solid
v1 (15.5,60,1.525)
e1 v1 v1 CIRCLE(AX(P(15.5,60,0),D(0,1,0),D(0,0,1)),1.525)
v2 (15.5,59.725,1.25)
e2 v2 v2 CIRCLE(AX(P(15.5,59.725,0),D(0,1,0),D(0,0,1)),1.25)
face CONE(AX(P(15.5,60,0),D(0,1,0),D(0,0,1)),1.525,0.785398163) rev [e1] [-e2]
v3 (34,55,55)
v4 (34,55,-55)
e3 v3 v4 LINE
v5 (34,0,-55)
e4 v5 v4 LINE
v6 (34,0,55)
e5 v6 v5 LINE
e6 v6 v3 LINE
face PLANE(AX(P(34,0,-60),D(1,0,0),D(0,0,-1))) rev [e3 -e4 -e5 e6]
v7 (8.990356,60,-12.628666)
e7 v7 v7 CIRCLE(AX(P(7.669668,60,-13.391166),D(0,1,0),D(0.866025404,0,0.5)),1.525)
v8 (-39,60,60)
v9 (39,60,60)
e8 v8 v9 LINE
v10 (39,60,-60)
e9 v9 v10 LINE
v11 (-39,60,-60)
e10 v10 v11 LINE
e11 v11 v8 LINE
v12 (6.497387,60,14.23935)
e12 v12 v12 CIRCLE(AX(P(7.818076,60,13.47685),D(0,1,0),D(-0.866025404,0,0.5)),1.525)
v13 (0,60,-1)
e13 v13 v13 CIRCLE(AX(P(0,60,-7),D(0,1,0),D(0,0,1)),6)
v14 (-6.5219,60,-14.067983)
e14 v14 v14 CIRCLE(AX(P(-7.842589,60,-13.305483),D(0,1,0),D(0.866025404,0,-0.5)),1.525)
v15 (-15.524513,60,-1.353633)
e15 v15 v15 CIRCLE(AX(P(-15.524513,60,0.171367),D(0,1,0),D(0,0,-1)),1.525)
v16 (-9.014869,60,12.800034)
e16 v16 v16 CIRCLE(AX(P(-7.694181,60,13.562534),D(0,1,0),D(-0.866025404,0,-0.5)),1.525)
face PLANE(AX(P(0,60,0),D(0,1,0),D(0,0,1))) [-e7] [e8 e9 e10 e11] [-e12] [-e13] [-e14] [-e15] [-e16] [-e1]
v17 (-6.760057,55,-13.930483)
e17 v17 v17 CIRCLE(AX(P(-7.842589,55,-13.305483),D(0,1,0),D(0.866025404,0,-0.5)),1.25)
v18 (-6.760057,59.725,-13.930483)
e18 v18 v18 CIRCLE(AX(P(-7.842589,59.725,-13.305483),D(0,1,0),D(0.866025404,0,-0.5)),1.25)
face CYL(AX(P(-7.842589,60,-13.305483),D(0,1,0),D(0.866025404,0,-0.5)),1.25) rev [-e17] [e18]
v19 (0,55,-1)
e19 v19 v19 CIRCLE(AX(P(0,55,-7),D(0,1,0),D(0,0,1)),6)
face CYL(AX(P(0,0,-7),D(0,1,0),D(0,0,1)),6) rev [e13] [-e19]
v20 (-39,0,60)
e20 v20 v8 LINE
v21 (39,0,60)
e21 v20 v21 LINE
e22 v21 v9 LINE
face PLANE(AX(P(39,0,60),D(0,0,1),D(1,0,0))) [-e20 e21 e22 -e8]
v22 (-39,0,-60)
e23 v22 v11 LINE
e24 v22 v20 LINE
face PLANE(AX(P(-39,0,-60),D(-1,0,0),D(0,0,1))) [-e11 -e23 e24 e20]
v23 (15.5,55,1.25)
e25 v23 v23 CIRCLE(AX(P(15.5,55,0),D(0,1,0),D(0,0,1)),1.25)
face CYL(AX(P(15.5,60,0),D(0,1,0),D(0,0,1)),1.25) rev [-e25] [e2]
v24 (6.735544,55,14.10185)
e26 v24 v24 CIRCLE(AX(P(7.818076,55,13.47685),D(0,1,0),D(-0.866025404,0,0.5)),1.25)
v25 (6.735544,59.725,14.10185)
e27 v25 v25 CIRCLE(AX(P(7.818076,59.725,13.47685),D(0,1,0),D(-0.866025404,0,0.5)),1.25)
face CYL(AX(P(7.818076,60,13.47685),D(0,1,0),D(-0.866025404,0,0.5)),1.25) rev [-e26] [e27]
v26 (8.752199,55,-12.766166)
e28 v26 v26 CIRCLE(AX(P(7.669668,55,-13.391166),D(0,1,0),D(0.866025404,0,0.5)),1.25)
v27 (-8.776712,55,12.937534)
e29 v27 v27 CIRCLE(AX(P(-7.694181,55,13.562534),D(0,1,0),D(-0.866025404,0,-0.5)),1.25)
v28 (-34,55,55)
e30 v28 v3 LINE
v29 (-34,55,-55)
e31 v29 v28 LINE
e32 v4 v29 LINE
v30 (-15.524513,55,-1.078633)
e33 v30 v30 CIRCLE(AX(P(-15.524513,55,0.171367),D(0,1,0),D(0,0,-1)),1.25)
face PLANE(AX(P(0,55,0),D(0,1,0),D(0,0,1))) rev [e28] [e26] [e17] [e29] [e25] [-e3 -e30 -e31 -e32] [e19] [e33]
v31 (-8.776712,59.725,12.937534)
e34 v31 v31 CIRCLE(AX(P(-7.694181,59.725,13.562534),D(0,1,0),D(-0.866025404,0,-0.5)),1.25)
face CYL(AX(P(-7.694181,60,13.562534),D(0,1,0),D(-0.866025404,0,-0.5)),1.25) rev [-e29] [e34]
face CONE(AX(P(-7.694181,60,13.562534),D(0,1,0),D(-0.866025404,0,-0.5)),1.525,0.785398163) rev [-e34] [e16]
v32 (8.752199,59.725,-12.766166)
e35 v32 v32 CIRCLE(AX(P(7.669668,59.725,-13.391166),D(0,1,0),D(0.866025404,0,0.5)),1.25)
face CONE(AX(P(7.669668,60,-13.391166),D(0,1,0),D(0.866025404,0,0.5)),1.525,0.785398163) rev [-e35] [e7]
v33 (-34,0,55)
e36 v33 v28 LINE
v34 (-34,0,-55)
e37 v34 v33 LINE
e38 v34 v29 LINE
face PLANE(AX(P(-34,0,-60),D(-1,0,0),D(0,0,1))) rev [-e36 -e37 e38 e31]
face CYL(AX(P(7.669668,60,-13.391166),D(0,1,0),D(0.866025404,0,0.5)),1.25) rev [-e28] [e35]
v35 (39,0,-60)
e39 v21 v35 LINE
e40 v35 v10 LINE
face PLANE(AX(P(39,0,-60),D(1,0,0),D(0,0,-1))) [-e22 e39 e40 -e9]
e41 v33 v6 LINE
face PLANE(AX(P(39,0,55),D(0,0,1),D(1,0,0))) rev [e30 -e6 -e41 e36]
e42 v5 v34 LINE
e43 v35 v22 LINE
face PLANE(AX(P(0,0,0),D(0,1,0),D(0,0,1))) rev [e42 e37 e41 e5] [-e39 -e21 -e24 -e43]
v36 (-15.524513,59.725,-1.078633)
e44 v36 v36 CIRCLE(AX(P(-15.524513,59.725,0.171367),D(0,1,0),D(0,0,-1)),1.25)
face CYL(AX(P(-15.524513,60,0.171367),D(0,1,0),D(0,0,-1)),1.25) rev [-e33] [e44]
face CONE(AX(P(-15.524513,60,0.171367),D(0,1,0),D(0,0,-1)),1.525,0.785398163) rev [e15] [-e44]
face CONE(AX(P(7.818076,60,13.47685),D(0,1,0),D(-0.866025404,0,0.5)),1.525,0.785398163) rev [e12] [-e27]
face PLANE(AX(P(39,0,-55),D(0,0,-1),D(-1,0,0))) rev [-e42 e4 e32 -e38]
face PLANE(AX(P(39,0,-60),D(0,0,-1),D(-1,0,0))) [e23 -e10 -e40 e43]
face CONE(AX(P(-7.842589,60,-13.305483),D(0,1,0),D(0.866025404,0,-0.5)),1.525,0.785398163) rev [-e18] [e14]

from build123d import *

# Parameters (mm, degrees)
IZIM1_R                     = 50
Y_KSEKLIK_EKSTR_ZYON1_DEPTH = 60
BO_ALTMA8_T                 = -5
IZIM2_R                     = 6
KES_EKSTR_ZYON1_DEPTH       = 60
DAIRESEL_KAPLAMA3_COUNT     = 6
IZIM6_R                     = 1.6
KES_EKSTR_ZYON2_DEPTH       = 4
DAIRESEL_KAPLAMA4_COUNT     = 6
IZIM7_W                     = 78
IZIM7_H                     = 120
Y_KSEKLIK_EKSTR_ZYON2_DEPTH = 60
KES_EKSTR_ZYON3_START       = -60
KES_EKSTR_ZYON3_DEPTH       = 60
BO_ALTMA9_T                 = -5
IZIM9_R                     = 6
KES_EKSTR_ZYON4_DEPTH       = 60
DAIRESEL_KAPLAMA5_COUNT     = 6


# Read off the part's stored shape, not the designer's step: M3x0.5 Dişli Delik1
with BuildPart() as part:
    # Çizim1 → Yükseklik-Ekstrüzyon1 (new body)
    with BuildSketch(Plane(origin=(0, 0, 0), x_dir=(1, 0, 0), z_dir=(0, 1, 0))):
        with Locations(Location((0, 0, 0), (0, 0, 270))):
            Circle(IZIM1_R)
    extrude(amount=Y_KSEKLIK_EKSTR_ZYON1_DEPTH)

    # İç Boşaltma8
    bo_altma8_openings = [part.faces().sort_by_distance(p)[0] for p in [
        (0, 0, 0),
    ]]
    offset(amount=BO_ALTMA8_T, openings=bo_altma8_openings, kind=Kind.INTERSECTION)

    # Çizim2 → Kes-Ekstrüzyon1 (cut)
    with BuildSketch(Plane(origin=(0, 60, 0), x_dir=(1, 0, 0), z_dir=(0, 1, 0))):
        with Locations(Location((0, 7, 0), (0, 0, 270))):
            Circle(IZIM2_R)
    extrude(amount=-KES_EKSTR_ZYON1_DEPTH, mode=Mode.SUBTRACT)

    # M3x0.5 Dişli Delik1 outline → M3x0.5 Dişli Delik1 (revolve, cut)
    with BuildSketch(Plane(origin=(15.5, 0, 0), x_dir=(1, 0, 0), z_dir=(0, 0, 1))):
        Polygon((0, 55), (1.25, 55), (1.25, 59.65), (1.6, 60), (0, 60), align=None)
    m3x0_5_di_li_delik1 = revolve(axis=Axis((15.5, 0, 0), (0, 1, 0)), mode=Mode.SUBTRACT)

    # Dairesel Kaplama3: M3x0.5 Dişli Delik1 ×6 about axis
    dairesel_kaplama3_axis = Axis((0, 0, 0), (0, 1, 0))
    for i in range(1, DAIRESEL_KAPLAMA3_COUNT):
        add(m3x0_5_di_li_delik1.rotate(dairesel_kaplama3_axis, i * 360 / DAIRESEL_KAPLAMA3_COUNT), mode=Mode.SUBTRACT)

    # Çizim6 → Kes-Ekstrüzyon2 (cut)
    with BuildSketch(Plane(origin=(0, 60, 0), x_dir=(1, 0, 0), z_dir=(0, 1, 0))):
        with Locations(Location((15.5, 0, 0), (0, 0, 270))):
            Circle(IZIM6_R)
    kes_ekstr_zyon2 = extrude(amount=-KES_EKSTR_ZYON2_DEPTH, mode=Mode.SUBTRACT)

    # Dairesel Kaplama4: Kes-Ekstrüzyon2 ×6 about axis
    dairesel_kaplama4_axis = Axis((0, 0, 0), (0, 1, 0))
    for i in range(1, DAIRESEL_KAPLAMA4_COUNT):
        add(kes_ekstr_zyon2.rotate(dairesel_kaplama4_axis, i * 360 / DAIRESEL_KAPLAMA4_COUNT), mode=Mode.SUBTRACT)

    # Çizim7 → Yükseklik-Ekstrüzyon2 (add)
    with BuildSketch(Plane(origin=(0, 60, 0), x_dir=(1, 0, 0), z_dir=(0, 1, 0))):
        Rectangle(IZIM7_W, IZIM7_H)
    extrude(amount=-Y_KSEKLIK_EKSTR_ZYON2_DEPTH)

    # Çizim8 → Kes-Ekstrüzyon3 (cut)
    with BuildSketch(Plane(origin=(0, 60, 0), x_dir=(1, 0, 0), z_dir=(0, 1, 0)).offset(KES_EKSTR_ZYON3_START)):
        with BuildLine():
            Line((-39, 31.288975694), (-39, -31.288975694))
            ThreePointArc((-39, -31.288975694), (-50, 0), (-39, 31.288975694))
        make_face()
        with BuildLine():
            Line((39, 31.288975694), (39, -31.288975694))
            ThreePointArc((39, -31.288975694), (50, 0), (39, 31.288975694))
        make_face()
    extrude(amount=KES_EKSTR_ZYON3_DEPTH, mode=Mode.SUBTRACT)

    # İç Boşaltma9
    bo_altma9_openings = [part.faces().sort_by_distance(p)[0] for p in [
        (0, 0, 0),
    ]]
    offset(amount=BO_ALTMA9_T, openings=bo_altma9_openings, kind=Kind.INTERSECTION)

    # Çizim9 → Kes-Ekstrüzyon4 (cut)
    with BuildSketch(Plane(origin=(0, 60, 0), x_dir=(1, 0, 0), z_dir=(0, 1, 0))):
        with Locations(Location((0, 7, 0), (0, 0, 270))):
            Circle(IZIM9_R)
    extrude(amount=-KES_EKSTR_ZYON4_DEPTH, mode=Mode.SUBTRACT)

    # Çizim16 → M3x0.5 Dişli Delik3 (revolve, cut)
    with BuildSketch(Plane(origin=(15.5, 60, 0), x_dir=(0, 0, 1), z_dir=(1, 0, 0))):
        Polygon((0, 0), (0, 9.251075774), (1.25, 8.5), (1.25, 0.275), (1.525, 0), align=None)
    m3x0_5_di_li_delik3 = revolve(axis=Axis((15.5, 66.35, 0), (0, -1, 0)), mode=Mode.SUBTRACT)

    # Dairesel Kaplama5: M3x0.5 Dişli Delik3 ×6 about axis
    dairesel_kaplama5_axis = Axis((-0.01225655, 0, 0.085683541), (0, 1, 0))
    for i in range(1, DAIRESEL_KAPLAMA5_COUNT):
        add(m3x0_5_di_li_delik3.rotate(dairesel_kaplama5_axis, i * 360 / DAIRESEL_KAPLAMA5_COUNT), mode=Mode.SUBTRACT)


solid = part.part
